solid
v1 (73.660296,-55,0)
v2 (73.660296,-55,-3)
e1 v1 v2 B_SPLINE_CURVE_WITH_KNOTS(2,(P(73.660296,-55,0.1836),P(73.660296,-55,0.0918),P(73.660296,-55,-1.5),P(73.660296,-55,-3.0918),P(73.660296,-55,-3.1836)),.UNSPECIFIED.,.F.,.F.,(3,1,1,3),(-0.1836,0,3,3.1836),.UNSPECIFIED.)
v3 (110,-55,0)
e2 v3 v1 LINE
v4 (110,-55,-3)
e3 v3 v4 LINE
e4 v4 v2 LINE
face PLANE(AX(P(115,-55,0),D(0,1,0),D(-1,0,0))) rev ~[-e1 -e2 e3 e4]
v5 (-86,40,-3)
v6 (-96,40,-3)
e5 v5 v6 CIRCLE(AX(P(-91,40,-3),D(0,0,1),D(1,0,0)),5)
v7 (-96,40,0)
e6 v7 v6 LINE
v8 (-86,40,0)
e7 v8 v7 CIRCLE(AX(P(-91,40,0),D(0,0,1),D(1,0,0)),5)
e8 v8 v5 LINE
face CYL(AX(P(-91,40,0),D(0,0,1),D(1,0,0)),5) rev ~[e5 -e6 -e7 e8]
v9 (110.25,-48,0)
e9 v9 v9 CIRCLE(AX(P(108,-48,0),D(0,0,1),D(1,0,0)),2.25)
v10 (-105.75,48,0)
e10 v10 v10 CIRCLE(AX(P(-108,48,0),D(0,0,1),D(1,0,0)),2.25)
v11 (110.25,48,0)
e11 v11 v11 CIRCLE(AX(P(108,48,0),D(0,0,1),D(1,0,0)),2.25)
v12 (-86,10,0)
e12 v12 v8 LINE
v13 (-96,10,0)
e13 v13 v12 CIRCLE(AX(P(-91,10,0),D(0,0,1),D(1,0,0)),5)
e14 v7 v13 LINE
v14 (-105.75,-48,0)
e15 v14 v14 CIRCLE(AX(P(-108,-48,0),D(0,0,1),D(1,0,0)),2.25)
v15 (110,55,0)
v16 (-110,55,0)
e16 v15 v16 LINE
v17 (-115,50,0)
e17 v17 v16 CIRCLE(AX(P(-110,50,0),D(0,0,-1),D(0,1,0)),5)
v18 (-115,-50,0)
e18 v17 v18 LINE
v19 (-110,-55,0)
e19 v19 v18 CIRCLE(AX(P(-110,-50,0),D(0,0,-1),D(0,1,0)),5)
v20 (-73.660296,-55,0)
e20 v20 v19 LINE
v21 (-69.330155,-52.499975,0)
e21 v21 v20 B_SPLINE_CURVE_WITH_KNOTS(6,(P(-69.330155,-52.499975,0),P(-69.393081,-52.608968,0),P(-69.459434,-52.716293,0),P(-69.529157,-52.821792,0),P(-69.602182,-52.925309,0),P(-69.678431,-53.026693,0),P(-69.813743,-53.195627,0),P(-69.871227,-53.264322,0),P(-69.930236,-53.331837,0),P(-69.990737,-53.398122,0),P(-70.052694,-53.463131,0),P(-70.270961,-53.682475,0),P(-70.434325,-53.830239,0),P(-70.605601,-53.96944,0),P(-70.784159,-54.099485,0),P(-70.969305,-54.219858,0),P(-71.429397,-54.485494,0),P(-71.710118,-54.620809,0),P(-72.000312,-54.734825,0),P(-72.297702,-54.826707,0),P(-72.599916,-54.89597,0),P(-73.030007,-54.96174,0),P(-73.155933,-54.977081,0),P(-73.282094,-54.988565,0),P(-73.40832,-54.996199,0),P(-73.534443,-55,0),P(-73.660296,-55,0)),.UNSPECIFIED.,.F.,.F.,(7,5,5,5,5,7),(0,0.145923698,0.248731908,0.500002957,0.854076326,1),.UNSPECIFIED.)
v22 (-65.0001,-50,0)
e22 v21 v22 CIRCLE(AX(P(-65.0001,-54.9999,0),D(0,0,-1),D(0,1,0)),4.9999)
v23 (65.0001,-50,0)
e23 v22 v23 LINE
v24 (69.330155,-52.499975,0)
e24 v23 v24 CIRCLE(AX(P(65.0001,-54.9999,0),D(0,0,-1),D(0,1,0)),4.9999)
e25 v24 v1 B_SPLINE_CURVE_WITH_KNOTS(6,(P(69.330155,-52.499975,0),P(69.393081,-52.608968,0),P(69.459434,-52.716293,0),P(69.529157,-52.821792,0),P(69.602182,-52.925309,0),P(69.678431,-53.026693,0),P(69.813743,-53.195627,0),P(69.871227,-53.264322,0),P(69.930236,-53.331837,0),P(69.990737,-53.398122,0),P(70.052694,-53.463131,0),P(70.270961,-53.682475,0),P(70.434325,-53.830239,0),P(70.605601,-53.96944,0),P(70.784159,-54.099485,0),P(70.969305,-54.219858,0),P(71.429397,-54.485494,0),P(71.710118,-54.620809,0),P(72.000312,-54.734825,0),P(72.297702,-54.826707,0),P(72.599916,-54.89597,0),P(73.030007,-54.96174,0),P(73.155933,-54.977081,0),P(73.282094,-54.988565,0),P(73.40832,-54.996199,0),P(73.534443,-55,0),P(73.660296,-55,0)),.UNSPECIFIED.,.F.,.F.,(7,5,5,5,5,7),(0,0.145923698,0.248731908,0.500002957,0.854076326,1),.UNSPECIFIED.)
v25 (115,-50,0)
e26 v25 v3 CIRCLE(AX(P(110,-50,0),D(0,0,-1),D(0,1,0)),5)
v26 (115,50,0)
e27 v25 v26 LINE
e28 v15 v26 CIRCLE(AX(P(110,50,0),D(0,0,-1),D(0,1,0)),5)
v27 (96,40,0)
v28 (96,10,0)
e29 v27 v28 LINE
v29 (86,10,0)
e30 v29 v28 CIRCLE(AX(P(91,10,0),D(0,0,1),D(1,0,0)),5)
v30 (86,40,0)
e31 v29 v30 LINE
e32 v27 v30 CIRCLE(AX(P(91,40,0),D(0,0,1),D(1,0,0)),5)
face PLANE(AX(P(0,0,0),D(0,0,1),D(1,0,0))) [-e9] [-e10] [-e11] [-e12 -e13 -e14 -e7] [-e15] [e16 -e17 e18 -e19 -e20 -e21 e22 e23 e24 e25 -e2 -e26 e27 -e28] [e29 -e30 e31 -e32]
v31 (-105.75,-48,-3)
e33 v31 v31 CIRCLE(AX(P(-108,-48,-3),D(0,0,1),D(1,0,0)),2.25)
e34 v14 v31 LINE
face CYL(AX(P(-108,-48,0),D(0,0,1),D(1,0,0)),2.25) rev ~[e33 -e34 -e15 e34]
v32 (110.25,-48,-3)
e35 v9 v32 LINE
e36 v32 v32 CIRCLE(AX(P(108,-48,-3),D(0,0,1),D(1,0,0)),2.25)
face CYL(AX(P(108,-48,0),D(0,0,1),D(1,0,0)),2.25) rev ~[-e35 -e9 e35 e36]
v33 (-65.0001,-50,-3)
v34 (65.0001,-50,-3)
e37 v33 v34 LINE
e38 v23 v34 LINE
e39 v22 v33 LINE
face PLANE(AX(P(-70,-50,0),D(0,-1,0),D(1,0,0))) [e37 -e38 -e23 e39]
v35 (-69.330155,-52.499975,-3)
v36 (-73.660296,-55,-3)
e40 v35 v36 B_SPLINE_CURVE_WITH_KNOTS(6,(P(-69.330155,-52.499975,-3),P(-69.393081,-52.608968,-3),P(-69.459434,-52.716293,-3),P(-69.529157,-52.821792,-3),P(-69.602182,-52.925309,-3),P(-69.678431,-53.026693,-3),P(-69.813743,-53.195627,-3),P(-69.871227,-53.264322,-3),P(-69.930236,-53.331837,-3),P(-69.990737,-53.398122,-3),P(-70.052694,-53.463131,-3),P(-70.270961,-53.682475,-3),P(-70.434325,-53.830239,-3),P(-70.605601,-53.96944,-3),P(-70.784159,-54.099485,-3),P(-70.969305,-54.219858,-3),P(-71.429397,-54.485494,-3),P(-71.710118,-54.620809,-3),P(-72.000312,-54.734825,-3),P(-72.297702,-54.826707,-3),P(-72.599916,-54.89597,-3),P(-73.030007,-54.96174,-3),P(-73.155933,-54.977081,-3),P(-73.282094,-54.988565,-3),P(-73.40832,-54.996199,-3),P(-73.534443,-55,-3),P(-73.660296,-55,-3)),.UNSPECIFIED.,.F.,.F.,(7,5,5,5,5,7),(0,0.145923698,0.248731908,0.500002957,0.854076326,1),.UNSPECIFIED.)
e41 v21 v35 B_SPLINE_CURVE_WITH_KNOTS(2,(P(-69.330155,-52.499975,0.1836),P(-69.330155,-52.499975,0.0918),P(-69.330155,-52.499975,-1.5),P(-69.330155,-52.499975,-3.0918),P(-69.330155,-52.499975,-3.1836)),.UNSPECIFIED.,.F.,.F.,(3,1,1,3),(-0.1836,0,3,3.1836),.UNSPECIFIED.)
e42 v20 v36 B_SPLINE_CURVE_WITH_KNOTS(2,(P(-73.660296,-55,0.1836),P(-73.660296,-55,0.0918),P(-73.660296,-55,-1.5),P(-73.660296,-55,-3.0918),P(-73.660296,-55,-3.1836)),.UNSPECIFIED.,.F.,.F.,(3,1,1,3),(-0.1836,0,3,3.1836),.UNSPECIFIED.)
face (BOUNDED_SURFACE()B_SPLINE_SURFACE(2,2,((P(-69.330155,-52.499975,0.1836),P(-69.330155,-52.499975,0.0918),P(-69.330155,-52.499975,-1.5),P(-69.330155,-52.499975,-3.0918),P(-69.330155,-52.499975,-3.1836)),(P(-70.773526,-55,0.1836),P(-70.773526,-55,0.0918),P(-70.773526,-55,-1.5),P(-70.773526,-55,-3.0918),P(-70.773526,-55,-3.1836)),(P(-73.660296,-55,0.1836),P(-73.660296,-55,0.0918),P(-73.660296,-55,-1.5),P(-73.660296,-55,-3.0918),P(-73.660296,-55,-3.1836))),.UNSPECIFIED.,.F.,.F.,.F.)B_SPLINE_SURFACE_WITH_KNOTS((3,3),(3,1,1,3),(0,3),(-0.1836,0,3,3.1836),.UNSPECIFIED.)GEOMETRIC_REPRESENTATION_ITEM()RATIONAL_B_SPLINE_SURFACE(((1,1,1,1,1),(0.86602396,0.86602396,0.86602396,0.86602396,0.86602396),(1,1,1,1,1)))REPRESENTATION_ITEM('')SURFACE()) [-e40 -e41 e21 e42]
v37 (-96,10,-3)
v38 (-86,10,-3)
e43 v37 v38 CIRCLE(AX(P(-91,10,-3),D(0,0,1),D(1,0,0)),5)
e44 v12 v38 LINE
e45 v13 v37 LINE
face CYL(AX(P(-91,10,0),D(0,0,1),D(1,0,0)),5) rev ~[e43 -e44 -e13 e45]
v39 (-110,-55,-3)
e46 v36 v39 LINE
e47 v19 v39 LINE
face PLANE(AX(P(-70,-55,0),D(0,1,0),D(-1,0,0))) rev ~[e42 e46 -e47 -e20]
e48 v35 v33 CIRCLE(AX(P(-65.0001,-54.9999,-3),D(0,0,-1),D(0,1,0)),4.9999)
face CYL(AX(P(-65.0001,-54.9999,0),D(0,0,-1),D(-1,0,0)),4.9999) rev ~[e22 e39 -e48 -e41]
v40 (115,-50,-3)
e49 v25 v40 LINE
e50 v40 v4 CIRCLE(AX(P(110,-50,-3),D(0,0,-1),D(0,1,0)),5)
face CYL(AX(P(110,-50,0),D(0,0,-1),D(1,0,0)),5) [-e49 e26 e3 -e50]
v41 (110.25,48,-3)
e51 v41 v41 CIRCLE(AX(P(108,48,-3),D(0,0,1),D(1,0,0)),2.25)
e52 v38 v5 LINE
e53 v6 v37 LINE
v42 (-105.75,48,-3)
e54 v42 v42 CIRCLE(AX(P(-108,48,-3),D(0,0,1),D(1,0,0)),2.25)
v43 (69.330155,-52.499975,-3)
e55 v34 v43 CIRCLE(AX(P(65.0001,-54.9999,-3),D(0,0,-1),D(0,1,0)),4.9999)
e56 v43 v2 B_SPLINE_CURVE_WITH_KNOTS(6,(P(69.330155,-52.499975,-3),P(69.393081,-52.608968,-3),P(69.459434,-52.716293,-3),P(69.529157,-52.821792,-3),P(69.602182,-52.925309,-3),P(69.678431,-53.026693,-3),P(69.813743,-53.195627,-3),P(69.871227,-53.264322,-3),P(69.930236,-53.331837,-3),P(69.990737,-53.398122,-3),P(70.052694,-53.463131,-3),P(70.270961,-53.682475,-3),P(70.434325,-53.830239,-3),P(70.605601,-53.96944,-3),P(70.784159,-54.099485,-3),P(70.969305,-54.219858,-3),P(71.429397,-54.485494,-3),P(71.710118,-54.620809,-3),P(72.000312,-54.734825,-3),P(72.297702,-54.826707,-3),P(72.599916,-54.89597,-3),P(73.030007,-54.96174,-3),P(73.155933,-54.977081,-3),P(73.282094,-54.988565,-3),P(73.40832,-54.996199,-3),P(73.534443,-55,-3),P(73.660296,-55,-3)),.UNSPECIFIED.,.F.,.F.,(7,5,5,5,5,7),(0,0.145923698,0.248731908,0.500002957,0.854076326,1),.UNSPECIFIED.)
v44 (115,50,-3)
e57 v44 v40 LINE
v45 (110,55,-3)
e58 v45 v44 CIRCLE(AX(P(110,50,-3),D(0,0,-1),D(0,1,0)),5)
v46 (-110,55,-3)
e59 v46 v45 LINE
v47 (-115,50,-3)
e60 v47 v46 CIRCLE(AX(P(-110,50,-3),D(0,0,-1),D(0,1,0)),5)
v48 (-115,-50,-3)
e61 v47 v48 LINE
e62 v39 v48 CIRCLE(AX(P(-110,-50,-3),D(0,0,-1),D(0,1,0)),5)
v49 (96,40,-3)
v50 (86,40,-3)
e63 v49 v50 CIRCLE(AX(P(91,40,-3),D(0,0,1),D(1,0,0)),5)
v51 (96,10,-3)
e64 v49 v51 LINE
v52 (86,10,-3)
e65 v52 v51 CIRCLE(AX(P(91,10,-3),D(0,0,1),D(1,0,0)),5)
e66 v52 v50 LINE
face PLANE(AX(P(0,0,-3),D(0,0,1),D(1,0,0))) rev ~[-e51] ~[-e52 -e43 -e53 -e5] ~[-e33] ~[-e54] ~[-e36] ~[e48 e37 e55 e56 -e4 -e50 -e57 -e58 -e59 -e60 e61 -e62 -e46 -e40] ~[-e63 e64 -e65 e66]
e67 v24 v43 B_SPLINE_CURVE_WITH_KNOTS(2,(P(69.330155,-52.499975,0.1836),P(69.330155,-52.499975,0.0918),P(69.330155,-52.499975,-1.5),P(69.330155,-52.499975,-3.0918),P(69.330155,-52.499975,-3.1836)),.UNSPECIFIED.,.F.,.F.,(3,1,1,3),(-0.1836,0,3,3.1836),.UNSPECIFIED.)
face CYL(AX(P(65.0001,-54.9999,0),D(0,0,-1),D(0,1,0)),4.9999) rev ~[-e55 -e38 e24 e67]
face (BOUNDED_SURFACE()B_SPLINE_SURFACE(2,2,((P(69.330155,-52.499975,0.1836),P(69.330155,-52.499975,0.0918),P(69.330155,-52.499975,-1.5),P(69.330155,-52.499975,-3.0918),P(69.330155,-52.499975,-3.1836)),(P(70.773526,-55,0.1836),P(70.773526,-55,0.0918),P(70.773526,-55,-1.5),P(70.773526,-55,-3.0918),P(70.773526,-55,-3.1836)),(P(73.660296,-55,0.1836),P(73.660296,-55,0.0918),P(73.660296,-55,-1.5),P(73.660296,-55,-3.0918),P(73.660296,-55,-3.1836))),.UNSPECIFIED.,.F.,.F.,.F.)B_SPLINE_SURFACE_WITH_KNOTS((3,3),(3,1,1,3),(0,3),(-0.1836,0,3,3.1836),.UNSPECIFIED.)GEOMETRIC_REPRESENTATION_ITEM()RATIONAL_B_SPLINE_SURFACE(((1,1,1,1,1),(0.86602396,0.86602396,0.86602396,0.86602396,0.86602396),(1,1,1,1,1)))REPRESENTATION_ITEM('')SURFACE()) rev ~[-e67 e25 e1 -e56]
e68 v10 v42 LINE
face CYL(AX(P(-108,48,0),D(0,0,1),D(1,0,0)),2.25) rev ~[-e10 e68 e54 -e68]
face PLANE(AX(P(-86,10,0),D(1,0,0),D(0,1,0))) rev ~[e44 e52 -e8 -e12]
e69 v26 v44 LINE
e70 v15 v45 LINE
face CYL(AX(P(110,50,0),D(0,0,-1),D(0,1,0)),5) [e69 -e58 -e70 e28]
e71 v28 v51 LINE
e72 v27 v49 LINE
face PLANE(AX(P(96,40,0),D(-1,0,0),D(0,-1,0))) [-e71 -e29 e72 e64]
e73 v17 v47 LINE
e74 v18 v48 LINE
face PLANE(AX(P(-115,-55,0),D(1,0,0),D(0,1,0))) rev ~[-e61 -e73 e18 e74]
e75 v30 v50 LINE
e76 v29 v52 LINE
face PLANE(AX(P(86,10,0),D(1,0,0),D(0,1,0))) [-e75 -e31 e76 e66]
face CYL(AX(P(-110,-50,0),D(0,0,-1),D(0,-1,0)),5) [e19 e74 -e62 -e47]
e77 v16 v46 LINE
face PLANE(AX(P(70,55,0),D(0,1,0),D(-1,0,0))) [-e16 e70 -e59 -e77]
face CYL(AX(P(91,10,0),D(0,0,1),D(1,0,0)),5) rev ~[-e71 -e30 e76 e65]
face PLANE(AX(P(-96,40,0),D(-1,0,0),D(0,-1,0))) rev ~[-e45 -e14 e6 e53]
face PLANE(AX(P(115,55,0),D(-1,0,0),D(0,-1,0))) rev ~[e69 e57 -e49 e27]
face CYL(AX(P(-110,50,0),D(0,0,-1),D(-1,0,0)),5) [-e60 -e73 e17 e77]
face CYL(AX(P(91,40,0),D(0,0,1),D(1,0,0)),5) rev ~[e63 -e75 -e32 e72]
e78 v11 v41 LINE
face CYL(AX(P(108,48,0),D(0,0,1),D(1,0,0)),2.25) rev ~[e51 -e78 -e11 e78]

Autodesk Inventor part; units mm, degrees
ref_plane "YZ Plane" through (0, 0, 0) normal (1, 0, 0) x (0, 1, 0)
ref_plane "XZ Plane" through (0, 0, 0) normal (0, 1, 0) x (-1, 0, 0)
ref_plane "XY Plane" through (0, 0, 0) normal (0, 0, 1) x (1, 0, 0)
sketch "Sketch1" plane through (0, 0, 0) normal (0, 0, 1) x (1, 0, 0)
  line L0 (-92.5, -50) -> (92.5, -50)
  line L1 (92.5, -50) -> (92.5, 50)
  line L2 (92.5, 50) -> (-92.5, 50)
  line L3 (-92.5, 50) -> (-92.5, -50)
  line L4 (-92.5, -50) -> (92.5, 50) construction
  line L5 (92.5, -50) -> (-92.5, 50) construction
  line L6 (70, 55) -> (115, 55)
  line L7 (115, 55) -> (115, 45)
  line L8 (115, 45) -> (70, 45)
  line L9 (70, 45) -> (70, 55)
  line L10 (70, 55) -> (115, 45) construction
  line L11 (115, 55) -> (70, 45) construction
  line L12 (70, -45) -> (115, -45)
  line L13 (115, -45) -> (115, -55)
  line L14 (115, -55) -> (70, -55)
  line L15 (70, -55) -> (70, -45)
  line L16 (70, -45) -> (115, -55) construction
  line L17 (115, -45) -> (70, -55) construction
  line L18 (-115, -45) -> (-70, -45)
  line L19 (-70, -45) -> (-70, -55)
  line L20 (-70, -55) -> (-115, -55)
  line L21 (-115, -55) -> (-115, -45)
  line L22 (-115, -45) -> (-70, -55) construction
  line L23 (-70, -45) -> (-115, -55) construction
  line L24 (-115, 55) -> (-70, 55)
  line L25 (-70, 55) -> (-70, 45)
  line L26 (-70, 45) -> (-115, 45)
  line L27 (-115, 45) -> (-115, 55)
  line L28 (-115, 55) -> (-70, 45) construction
  line L29 (-70, 55) -> (-115, 45) construction
  line L30 (70, 45) -> (115, 45)
  line L31 (115, 45) -> (115, -45)
  line L32 (115, -45) -> (70, -45)
  line L33 (70, -45) -> (70, 45)
  line L34 (70, 45) -> (115, -45) construction
  line L35 (115, 45) -> (70, -45) construction
  line L36 (-115, 45) -> (-70, 45)
  line L37 (-70, 45) -> (-70, -45)
  line L38 (-70, -45) -> (-115, -45)
  line L39 (-115, -45) -> (-115, 45)
  line L40 (-115, 45) -> (-70, -45) construction
  line L41 (-70, 45) -> (-115, -45) construction
  line L42 (115, 45) -> (115, 25)
  line L43 (115, -45) -> (115, -25)
  line L44 (-115, -45) -> (-115, -25)
  line L45 (-115, 45) -> (-115, 25)
  line L46 (70, 55) -> (-70, 55)
  line L47 (-70, 55) -> (-70, 50)
  line L48 (-70, 50) -> (70, 50)
  line L49 (70, 50) -> (70, 55)
  point P0 (0, 0)
  point P1 (0, 0)
  point P2 (92.5, 0)
  point P3 (-92.5, 0)
  point P4 (-70, -50)
  point P5 (70, -50)
  dimension "d0" = 185
  dimension "d1" = 100
  dimension "d2" = 45
  dimension "d3" = 10
  dimension "d4" = 45
  dimension "d5" = 10
  dimension "d6" = 45
  dimension "d7" = 45
  dimension "d8" = 10
  dimension "d9" = 45
  dimension "d10" = 90
  dimension "d11" = 20
  dimension "d12" = 20
  dimension "d13" = 20
  dimension "d14" = 20
  dimension "d15" = 45
extrude "Extrusion1" add sketch "Sketch1" against normal blind 3
fillet "Fillet1" radius 5 8 edges at (-115, 55, -1.5) (115, 55, -1.5) (115, -55, -1.5) (70, -55, -1.5) (70, -50, -1.5) (-70, -50, -1.5) (-70, -55, -1.5) (-115, -55, -1.5)
sketch "Sketch2" plane through (0, 0, 0) normal (0, 0, 1) x (1, 0, 0)
  circle A0 centre (-91, 40) radius 5
  circle A1 centre (-91, 10) radius 5
  line L0 (-96, 40) -> (-96, 10)
  line L1 (-86, 10) -> (-86, 40)
  line L2 (-73.6603, 55) -> (-110, 55) projected
  line L3 (-115, 50) -> (-115, -50) projected
  circle A2 centre (-108, 48) radius 2.25
  line L4 (0, 60.4736) -> (0, -65.7733) construction
  circle A3 centre (91, 40) radius 5
  circle A4 centre (91, 10) radius 5
  line L5 (96, 40) -> (96, 10)
  line L6 (86, 10) -> (86, 40)
  circle A5 centre (108, 48) radius 2.25
  line L7 (-147.6516, 0) -> (131.888, 0) construction
  circle A6 centre (-108, -48) radius 2.25
  circle A7 centre (108, -48) radius 2.25
  point P0 (0, 0)
  dimension "d19" = 10
  dimension "d20" = 10
  dimension "d24" = 15
  dimension "d25" = 24
  dimension "d26" = 24
  dimension "d27" = 19
  dimension "d28" = 45
  dimension "d32" = 7
  dimension "d33" = 7
extrude "Extrusion2" cut sketch "Sketch2" against normal blind 3
properties part number "CONTROLBOARD_KLEP"
